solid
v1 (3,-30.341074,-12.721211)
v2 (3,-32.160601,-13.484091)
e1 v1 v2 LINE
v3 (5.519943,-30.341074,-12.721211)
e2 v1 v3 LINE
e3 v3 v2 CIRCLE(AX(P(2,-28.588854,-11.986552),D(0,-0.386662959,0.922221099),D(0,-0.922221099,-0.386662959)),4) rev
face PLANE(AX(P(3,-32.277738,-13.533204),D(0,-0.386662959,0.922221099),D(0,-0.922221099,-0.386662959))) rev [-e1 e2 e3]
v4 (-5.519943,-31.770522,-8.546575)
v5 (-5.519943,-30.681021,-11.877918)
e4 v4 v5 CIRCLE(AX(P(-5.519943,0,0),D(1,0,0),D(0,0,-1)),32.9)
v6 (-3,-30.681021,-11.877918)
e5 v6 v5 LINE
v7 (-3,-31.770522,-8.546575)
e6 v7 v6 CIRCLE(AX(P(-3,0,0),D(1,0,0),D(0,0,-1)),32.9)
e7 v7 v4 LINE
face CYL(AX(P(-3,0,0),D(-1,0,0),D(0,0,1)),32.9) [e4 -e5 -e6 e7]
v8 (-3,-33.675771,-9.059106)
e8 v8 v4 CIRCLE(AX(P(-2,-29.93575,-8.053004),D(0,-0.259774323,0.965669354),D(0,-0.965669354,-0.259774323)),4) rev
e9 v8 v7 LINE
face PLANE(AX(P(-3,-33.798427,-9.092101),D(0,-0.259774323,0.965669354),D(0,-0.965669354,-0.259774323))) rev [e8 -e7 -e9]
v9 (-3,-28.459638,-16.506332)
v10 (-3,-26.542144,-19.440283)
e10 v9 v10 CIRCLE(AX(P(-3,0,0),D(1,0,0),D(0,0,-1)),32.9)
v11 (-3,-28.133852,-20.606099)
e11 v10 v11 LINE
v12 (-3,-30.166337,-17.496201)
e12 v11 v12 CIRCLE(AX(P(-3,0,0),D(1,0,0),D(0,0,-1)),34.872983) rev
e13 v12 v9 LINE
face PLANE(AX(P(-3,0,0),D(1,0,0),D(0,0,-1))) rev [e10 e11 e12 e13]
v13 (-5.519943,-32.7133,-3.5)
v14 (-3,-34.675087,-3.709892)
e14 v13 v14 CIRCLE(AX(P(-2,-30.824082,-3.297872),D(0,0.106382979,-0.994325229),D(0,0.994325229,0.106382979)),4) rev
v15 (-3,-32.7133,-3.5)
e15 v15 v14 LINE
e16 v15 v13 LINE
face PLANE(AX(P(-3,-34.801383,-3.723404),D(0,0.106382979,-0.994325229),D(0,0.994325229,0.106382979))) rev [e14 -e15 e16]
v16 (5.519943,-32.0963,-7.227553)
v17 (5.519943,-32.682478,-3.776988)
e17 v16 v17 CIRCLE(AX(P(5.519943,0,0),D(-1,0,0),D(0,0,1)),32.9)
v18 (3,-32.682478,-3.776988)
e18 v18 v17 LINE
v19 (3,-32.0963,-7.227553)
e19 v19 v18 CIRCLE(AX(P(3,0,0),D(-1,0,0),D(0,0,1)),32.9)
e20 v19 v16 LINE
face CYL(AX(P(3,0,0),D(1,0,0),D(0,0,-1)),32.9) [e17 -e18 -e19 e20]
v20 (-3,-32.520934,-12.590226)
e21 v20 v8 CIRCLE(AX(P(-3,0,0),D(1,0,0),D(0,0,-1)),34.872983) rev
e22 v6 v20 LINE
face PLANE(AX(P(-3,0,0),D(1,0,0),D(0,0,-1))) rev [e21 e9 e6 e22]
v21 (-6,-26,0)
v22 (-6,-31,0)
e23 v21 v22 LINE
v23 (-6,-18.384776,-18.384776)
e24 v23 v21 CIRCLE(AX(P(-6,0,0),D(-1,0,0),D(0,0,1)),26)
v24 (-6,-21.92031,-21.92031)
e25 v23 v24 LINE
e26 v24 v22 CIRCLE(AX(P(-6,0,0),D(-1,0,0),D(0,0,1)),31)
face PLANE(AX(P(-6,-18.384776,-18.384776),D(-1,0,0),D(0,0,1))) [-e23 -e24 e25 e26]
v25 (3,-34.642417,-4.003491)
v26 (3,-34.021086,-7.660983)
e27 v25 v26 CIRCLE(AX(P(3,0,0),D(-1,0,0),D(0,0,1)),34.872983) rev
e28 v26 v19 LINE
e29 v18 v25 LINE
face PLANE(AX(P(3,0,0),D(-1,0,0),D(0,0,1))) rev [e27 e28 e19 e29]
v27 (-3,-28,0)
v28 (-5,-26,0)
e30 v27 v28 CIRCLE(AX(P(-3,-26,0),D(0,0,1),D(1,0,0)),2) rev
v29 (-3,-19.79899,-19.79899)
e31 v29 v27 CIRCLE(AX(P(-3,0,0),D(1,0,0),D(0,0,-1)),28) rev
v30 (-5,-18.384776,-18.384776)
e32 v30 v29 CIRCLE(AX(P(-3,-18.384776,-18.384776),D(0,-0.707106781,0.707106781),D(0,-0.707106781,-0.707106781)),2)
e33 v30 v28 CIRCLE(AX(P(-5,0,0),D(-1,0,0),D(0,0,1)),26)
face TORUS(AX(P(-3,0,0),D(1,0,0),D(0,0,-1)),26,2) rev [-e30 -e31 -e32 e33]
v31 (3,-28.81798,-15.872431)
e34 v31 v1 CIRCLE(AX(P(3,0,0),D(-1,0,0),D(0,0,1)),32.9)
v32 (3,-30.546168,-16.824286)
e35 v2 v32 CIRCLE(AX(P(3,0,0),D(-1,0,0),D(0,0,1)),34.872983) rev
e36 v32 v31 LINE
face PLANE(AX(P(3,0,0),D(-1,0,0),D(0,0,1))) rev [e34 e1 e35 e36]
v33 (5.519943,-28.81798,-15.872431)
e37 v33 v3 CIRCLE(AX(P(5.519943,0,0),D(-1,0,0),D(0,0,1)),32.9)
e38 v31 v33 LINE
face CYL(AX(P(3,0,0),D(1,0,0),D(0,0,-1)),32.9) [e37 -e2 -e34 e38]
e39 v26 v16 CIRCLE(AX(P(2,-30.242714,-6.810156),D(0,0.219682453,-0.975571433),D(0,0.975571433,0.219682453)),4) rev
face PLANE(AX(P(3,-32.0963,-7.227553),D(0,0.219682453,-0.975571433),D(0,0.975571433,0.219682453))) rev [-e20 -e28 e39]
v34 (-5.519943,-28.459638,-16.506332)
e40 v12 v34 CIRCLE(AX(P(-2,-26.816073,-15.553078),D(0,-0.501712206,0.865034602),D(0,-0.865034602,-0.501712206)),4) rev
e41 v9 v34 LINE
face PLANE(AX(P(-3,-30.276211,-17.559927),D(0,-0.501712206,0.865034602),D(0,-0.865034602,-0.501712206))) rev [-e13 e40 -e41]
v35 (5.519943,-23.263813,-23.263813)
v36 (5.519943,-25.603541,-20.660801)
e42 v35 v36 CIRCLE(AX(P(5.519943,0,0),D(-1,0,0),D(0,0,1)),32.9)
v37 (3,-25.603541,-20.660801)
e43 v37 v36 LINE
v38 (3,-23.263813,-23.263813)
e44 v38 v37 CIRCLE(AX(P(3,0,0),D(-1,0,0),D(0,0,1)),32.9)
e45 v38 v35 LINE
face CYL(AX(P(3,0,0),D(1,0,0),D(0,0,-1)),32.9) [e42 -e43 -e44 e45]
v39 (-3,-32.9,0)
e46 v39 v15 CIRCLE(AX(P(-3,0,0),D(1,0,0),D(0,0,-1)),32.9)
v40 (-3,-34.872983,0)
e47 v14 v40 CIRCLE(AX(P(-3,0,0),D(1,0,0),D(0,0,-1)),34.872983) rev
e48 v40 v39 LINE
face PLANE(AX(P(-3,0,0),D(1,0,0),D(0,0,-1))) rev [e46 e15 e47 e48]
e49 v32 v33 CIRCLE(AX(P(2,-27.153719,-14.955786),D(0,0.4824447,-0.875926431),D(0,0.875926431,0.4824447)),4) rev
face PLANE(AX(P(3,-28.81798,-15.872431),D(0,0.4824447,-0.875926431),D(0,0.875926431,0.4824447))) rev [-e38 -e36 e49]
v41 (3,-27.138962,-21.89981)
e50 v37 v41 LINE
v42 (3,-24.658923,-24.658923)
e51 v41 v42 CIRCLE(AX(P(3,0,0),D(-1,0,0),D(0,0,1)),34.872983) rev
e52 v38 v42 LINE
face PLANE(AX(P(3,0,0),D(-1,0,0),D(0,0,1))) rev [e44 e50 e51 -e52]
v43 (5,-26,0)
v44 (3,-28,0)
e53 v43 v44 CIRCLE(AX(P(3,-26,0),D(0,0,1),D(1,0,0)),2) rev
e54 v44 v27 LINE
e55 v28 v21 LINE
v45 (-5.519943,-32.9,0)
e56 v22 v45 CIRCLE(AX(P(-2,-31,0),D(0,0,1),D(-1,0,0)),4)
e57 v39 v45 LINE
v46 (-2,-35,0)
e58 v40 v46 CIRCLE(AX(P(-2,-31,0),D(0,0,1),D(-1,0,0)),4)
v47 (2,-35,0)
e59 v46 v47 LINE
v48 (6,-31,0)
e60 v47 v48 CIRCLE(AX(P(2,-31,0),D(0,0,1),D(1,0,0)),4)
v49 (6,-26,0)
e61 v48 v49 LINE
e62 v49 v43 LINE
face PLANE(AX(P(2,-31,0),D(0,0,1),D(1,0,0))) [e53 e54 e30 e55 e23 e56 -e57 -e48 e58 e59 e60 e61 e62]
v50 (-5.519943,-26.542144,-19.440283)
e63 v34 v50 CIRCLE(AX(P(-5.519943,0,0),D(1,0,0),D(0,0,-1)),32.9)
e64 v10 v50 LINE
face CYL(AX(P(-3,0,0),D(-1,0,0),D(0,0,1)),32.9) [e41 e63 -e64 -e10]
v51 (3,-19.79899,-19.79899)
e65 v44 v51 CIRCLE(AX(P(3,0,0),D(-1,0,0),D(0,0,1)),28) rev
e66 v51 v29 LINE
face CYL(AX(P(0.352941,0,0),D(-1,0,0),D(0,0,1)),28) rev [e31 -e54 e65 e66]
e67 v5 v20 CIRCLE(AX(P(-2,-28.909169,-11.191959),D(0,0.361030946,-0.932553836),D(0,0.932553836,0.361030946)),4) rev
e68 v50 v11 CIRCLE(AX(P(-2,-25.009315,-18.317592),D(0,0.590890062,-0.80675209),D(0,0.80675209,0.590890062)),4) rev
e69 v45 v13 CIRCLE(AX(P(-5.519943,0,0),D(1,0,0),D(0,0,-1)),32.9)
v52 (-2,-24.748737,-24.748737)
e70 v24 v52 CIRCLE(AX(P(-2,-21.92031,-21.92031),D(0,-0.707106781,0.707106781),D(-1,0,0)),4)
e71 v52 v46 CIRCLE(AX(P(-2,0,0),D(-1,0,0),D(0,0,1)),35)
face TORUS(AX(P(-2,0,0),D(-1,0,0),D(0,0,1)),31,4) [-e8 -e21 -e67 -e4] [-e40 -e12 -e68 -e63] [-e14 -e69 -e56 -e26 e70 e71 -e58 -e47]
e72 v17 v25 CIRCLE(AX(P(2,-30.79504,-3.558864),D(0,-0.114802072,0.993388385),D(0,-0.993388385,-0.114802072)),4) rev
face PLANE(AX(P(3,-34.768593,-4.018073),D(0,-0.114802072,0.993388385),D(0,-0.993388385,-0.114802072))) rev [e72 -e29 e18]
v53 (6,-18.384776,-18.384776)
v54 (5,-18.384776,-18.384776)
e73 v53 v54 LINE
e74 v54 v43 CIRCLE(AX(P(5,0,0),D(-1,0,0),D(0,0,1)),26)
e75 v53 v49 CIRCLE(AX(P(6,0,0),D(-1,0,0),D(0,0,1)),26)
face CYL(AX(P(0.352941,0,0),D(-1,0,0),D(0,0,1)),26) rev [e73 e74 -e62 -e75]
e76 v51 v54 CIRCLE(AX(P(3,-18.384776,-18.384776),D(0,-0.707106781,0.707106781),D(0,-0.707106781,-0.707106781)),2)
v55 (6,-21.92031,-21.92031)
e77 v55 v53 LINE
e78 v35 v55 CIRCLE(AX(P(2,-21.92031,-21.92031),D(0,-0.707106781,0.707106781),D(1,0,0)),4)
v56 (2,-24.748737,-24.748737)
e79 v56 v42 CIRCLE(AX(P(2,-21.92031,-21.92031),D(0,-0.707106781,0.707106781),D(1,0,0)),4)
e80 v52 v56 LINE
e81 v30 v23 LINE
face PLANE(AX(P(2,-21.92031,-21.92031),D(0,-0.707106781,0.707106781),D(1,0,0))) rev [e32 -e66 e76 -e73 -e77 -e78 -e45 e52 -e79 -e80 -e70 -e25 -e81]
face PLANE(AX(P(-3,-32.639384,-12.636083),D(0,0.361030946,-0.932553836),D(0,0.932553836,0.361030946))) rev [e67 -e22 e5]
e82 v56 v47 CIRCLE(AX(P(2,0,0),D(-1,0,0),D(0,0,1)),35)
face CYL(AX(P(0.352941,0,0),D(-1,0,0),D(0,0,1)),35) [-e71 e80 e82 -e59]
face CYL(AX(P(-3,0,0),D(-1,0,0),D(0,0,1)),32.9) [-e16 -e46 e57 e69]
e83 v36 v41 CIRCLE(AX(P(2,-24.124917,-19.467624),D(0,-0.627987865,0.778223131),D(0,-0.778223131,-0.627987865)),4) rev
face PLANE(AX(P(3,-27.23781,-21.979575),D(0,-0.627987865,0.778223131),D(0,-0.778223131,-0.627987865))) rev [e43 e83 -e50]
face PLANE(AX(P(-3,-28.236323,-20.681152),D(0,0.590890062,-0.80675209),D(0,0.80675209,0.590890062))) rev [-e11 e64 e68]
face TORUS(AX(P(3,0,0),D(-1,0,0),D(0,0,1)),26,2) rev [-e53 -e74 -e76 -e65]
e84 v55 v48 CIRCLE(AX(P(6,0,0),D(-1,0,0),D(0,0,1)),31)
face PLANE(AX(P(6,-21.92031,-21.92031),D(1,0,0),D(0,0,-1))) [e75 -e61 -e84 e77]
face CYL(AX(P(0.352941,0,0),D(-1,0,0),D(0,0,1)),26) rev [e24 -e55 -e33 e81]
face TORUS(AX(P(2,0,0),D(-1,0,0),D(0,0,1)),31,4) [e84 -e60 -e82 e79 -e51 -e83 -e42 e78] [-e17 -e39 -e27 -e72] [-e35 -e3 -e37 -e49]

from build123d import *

# Parameters (mm, degrees)
REVOLVE1_ANGLE     = 45
CUT_EXTRUDE1_START = -3
CUT_EXTRUDE1_DEPTH = 3
CUT_EXTRUDE2_DEPTH = 3
FILLET1_R          = 2


with BuildPart() as part:
    # Sketch1 → Revolve1 (revolve)
    with BuildSketch(Plane.XY):
        with BuildLine():
            Line((-5, -28), (5, -28))
            Line((5, -28), (5, -26))
            Line((5, -26), (6, -26))
            Line((6, -26), (6, -31))
            ThreePointArc((6, -31), (4.828427125, -33.828427125), (2, -35))
            Line((2, -35), (-2, -35))
            ThreePointArc((-2, -35), (-4.828427125, -33.828427125), (-6, -31))
            Line((-6, -31), (-6, -26))
            Line((-6, -26), (-5, -26))
            Line((-5, -26), (-5, -28))
        make_face()
    revolve(axis=Axis((0.352941176, 0, 0), (1, 0, 0)), revolution_arc=REVOLVE1_ANGLE)

    # Sketch2 → Cut-Extrude1 (cut)
    with BuildSketch(Plane(origin=(6, 0, 0), x_dir=(0, 0, -1), z_dir=(1, 0, 0)).offset(CUT_EXTRUDE1_START)):
        with BuildLine():
            Line((21.979575266, -27.237809588), (20.66080075, -25.603541012))
            ThreePointArc((20.66080075, -25.603541012), (21.993442367, -24.468316101), (23.263813101, -23.263813101))
            Line((23.263813101, -23.263813101), (24.748737342, -24.748737342))
            ThreePointArc((24.748737342, -24.748737342), (23.397279114, -26.030123512), (21.979575266, -27.237809588))
        make_face()
        with BuildLine():
            Line((15.87243062, -28.817979565), (16.88556449, -30.657425069))
            ThreePointArc((16.88556449, -30.657425069), (15.230946014, -31.512192617), (13.533203573, -32.277738475))
            Line((13.533203573, -32.277738475), (12.721211358, -30.341074166))
            ThreePointArc((12.721211358, -30.341074166), (14.317089253, -29.62146106), (15.87243062, -28.817979565))
        make_face()
        with BuildLine():
            Line((7.227552694, -32.09630013), (7.688885845, -34.145000139))
            ThreePointArc((7.688885845, -34.145000139), (5.861777513, -34.505645399), (4.018072504, -34.768593491))
            Line((4.018072504, -34.768593491), (3.776988154, -32.682477882))
            ThreePointArc((3.776988154, -32.682477882), (5.510070862, -32.435306675), (7.227552694, -32.09630013))
        make_face()
    extrude(amount=CUT_EXTRUDE1_DEPTH, mode=Mode.SUBTRACT)

    # Sketch3 → Cut-Extrude2 (cut)
    with BuildSketch(Plane.ZY.offset(6)):
        with BuildLine():
            Line((0, -35), (0, -32.9))
            ThreePointArc((0, -32.9), (-1.752488008, -32.853291856), (-3.5, -32.713300048))
            Line((-3.5, -32.713300048), (-3.723404255, -34.801383029))
            ThreePointArc((-3.723404255, -34.801383029), (-1.864348945, -34.950310485), (0, -35))
        make_face()
        with BuildLine():
            Line((-12.636083101, -32.639384245), (-11.877918115, -30.68102119))
            ThreePointArc((-11.877918115, -30.68102119), (-10.226765616, -31.270165734), (-8.54657523, -31.770521743))
            Line((-8.54657523, -31.770521743), (-9.092101309, -33.798427386))
            ThreePointArc((-9.092101309, -33.798427386), (-10.879537889, -33.26613376), (-12.636083101, -32.639384245))
        make_face()
        with BuildLine():
            Line((-20.681152153, -28.236323161), (-19.440283023, -26.542143771))
            ThreePointArc((-19.440283023, -26.542143771), (-17.998860282, -27.539989625), (-16.506331561, -28.45963841))
            Line((-16.506331561, -28.45963841), (-17.559927193, -30.276211074))
            ThreePointArc((-17.559927193, -30.276211074), (-19.147723704, -29.297861303), (-20.681152153, -28.236323161))
        make_face()
    extrude(amount=-CUT_EXTRUDE2_DEPTH, mode=Mode.SUBTRACT)

    # Fillet1
    fillet1_edges = [part.edges().sort_by_distance(p)[0] for p in [
        (5, -25.86862691, -10.715136106),
        (-5, -25.86862691, -10.715136106),
    ]]
    fillet(fillet1_edges, radius=FILLET1_R - 0.0001)  # a hair under: the kernel refuses the full size


solid = part.part
